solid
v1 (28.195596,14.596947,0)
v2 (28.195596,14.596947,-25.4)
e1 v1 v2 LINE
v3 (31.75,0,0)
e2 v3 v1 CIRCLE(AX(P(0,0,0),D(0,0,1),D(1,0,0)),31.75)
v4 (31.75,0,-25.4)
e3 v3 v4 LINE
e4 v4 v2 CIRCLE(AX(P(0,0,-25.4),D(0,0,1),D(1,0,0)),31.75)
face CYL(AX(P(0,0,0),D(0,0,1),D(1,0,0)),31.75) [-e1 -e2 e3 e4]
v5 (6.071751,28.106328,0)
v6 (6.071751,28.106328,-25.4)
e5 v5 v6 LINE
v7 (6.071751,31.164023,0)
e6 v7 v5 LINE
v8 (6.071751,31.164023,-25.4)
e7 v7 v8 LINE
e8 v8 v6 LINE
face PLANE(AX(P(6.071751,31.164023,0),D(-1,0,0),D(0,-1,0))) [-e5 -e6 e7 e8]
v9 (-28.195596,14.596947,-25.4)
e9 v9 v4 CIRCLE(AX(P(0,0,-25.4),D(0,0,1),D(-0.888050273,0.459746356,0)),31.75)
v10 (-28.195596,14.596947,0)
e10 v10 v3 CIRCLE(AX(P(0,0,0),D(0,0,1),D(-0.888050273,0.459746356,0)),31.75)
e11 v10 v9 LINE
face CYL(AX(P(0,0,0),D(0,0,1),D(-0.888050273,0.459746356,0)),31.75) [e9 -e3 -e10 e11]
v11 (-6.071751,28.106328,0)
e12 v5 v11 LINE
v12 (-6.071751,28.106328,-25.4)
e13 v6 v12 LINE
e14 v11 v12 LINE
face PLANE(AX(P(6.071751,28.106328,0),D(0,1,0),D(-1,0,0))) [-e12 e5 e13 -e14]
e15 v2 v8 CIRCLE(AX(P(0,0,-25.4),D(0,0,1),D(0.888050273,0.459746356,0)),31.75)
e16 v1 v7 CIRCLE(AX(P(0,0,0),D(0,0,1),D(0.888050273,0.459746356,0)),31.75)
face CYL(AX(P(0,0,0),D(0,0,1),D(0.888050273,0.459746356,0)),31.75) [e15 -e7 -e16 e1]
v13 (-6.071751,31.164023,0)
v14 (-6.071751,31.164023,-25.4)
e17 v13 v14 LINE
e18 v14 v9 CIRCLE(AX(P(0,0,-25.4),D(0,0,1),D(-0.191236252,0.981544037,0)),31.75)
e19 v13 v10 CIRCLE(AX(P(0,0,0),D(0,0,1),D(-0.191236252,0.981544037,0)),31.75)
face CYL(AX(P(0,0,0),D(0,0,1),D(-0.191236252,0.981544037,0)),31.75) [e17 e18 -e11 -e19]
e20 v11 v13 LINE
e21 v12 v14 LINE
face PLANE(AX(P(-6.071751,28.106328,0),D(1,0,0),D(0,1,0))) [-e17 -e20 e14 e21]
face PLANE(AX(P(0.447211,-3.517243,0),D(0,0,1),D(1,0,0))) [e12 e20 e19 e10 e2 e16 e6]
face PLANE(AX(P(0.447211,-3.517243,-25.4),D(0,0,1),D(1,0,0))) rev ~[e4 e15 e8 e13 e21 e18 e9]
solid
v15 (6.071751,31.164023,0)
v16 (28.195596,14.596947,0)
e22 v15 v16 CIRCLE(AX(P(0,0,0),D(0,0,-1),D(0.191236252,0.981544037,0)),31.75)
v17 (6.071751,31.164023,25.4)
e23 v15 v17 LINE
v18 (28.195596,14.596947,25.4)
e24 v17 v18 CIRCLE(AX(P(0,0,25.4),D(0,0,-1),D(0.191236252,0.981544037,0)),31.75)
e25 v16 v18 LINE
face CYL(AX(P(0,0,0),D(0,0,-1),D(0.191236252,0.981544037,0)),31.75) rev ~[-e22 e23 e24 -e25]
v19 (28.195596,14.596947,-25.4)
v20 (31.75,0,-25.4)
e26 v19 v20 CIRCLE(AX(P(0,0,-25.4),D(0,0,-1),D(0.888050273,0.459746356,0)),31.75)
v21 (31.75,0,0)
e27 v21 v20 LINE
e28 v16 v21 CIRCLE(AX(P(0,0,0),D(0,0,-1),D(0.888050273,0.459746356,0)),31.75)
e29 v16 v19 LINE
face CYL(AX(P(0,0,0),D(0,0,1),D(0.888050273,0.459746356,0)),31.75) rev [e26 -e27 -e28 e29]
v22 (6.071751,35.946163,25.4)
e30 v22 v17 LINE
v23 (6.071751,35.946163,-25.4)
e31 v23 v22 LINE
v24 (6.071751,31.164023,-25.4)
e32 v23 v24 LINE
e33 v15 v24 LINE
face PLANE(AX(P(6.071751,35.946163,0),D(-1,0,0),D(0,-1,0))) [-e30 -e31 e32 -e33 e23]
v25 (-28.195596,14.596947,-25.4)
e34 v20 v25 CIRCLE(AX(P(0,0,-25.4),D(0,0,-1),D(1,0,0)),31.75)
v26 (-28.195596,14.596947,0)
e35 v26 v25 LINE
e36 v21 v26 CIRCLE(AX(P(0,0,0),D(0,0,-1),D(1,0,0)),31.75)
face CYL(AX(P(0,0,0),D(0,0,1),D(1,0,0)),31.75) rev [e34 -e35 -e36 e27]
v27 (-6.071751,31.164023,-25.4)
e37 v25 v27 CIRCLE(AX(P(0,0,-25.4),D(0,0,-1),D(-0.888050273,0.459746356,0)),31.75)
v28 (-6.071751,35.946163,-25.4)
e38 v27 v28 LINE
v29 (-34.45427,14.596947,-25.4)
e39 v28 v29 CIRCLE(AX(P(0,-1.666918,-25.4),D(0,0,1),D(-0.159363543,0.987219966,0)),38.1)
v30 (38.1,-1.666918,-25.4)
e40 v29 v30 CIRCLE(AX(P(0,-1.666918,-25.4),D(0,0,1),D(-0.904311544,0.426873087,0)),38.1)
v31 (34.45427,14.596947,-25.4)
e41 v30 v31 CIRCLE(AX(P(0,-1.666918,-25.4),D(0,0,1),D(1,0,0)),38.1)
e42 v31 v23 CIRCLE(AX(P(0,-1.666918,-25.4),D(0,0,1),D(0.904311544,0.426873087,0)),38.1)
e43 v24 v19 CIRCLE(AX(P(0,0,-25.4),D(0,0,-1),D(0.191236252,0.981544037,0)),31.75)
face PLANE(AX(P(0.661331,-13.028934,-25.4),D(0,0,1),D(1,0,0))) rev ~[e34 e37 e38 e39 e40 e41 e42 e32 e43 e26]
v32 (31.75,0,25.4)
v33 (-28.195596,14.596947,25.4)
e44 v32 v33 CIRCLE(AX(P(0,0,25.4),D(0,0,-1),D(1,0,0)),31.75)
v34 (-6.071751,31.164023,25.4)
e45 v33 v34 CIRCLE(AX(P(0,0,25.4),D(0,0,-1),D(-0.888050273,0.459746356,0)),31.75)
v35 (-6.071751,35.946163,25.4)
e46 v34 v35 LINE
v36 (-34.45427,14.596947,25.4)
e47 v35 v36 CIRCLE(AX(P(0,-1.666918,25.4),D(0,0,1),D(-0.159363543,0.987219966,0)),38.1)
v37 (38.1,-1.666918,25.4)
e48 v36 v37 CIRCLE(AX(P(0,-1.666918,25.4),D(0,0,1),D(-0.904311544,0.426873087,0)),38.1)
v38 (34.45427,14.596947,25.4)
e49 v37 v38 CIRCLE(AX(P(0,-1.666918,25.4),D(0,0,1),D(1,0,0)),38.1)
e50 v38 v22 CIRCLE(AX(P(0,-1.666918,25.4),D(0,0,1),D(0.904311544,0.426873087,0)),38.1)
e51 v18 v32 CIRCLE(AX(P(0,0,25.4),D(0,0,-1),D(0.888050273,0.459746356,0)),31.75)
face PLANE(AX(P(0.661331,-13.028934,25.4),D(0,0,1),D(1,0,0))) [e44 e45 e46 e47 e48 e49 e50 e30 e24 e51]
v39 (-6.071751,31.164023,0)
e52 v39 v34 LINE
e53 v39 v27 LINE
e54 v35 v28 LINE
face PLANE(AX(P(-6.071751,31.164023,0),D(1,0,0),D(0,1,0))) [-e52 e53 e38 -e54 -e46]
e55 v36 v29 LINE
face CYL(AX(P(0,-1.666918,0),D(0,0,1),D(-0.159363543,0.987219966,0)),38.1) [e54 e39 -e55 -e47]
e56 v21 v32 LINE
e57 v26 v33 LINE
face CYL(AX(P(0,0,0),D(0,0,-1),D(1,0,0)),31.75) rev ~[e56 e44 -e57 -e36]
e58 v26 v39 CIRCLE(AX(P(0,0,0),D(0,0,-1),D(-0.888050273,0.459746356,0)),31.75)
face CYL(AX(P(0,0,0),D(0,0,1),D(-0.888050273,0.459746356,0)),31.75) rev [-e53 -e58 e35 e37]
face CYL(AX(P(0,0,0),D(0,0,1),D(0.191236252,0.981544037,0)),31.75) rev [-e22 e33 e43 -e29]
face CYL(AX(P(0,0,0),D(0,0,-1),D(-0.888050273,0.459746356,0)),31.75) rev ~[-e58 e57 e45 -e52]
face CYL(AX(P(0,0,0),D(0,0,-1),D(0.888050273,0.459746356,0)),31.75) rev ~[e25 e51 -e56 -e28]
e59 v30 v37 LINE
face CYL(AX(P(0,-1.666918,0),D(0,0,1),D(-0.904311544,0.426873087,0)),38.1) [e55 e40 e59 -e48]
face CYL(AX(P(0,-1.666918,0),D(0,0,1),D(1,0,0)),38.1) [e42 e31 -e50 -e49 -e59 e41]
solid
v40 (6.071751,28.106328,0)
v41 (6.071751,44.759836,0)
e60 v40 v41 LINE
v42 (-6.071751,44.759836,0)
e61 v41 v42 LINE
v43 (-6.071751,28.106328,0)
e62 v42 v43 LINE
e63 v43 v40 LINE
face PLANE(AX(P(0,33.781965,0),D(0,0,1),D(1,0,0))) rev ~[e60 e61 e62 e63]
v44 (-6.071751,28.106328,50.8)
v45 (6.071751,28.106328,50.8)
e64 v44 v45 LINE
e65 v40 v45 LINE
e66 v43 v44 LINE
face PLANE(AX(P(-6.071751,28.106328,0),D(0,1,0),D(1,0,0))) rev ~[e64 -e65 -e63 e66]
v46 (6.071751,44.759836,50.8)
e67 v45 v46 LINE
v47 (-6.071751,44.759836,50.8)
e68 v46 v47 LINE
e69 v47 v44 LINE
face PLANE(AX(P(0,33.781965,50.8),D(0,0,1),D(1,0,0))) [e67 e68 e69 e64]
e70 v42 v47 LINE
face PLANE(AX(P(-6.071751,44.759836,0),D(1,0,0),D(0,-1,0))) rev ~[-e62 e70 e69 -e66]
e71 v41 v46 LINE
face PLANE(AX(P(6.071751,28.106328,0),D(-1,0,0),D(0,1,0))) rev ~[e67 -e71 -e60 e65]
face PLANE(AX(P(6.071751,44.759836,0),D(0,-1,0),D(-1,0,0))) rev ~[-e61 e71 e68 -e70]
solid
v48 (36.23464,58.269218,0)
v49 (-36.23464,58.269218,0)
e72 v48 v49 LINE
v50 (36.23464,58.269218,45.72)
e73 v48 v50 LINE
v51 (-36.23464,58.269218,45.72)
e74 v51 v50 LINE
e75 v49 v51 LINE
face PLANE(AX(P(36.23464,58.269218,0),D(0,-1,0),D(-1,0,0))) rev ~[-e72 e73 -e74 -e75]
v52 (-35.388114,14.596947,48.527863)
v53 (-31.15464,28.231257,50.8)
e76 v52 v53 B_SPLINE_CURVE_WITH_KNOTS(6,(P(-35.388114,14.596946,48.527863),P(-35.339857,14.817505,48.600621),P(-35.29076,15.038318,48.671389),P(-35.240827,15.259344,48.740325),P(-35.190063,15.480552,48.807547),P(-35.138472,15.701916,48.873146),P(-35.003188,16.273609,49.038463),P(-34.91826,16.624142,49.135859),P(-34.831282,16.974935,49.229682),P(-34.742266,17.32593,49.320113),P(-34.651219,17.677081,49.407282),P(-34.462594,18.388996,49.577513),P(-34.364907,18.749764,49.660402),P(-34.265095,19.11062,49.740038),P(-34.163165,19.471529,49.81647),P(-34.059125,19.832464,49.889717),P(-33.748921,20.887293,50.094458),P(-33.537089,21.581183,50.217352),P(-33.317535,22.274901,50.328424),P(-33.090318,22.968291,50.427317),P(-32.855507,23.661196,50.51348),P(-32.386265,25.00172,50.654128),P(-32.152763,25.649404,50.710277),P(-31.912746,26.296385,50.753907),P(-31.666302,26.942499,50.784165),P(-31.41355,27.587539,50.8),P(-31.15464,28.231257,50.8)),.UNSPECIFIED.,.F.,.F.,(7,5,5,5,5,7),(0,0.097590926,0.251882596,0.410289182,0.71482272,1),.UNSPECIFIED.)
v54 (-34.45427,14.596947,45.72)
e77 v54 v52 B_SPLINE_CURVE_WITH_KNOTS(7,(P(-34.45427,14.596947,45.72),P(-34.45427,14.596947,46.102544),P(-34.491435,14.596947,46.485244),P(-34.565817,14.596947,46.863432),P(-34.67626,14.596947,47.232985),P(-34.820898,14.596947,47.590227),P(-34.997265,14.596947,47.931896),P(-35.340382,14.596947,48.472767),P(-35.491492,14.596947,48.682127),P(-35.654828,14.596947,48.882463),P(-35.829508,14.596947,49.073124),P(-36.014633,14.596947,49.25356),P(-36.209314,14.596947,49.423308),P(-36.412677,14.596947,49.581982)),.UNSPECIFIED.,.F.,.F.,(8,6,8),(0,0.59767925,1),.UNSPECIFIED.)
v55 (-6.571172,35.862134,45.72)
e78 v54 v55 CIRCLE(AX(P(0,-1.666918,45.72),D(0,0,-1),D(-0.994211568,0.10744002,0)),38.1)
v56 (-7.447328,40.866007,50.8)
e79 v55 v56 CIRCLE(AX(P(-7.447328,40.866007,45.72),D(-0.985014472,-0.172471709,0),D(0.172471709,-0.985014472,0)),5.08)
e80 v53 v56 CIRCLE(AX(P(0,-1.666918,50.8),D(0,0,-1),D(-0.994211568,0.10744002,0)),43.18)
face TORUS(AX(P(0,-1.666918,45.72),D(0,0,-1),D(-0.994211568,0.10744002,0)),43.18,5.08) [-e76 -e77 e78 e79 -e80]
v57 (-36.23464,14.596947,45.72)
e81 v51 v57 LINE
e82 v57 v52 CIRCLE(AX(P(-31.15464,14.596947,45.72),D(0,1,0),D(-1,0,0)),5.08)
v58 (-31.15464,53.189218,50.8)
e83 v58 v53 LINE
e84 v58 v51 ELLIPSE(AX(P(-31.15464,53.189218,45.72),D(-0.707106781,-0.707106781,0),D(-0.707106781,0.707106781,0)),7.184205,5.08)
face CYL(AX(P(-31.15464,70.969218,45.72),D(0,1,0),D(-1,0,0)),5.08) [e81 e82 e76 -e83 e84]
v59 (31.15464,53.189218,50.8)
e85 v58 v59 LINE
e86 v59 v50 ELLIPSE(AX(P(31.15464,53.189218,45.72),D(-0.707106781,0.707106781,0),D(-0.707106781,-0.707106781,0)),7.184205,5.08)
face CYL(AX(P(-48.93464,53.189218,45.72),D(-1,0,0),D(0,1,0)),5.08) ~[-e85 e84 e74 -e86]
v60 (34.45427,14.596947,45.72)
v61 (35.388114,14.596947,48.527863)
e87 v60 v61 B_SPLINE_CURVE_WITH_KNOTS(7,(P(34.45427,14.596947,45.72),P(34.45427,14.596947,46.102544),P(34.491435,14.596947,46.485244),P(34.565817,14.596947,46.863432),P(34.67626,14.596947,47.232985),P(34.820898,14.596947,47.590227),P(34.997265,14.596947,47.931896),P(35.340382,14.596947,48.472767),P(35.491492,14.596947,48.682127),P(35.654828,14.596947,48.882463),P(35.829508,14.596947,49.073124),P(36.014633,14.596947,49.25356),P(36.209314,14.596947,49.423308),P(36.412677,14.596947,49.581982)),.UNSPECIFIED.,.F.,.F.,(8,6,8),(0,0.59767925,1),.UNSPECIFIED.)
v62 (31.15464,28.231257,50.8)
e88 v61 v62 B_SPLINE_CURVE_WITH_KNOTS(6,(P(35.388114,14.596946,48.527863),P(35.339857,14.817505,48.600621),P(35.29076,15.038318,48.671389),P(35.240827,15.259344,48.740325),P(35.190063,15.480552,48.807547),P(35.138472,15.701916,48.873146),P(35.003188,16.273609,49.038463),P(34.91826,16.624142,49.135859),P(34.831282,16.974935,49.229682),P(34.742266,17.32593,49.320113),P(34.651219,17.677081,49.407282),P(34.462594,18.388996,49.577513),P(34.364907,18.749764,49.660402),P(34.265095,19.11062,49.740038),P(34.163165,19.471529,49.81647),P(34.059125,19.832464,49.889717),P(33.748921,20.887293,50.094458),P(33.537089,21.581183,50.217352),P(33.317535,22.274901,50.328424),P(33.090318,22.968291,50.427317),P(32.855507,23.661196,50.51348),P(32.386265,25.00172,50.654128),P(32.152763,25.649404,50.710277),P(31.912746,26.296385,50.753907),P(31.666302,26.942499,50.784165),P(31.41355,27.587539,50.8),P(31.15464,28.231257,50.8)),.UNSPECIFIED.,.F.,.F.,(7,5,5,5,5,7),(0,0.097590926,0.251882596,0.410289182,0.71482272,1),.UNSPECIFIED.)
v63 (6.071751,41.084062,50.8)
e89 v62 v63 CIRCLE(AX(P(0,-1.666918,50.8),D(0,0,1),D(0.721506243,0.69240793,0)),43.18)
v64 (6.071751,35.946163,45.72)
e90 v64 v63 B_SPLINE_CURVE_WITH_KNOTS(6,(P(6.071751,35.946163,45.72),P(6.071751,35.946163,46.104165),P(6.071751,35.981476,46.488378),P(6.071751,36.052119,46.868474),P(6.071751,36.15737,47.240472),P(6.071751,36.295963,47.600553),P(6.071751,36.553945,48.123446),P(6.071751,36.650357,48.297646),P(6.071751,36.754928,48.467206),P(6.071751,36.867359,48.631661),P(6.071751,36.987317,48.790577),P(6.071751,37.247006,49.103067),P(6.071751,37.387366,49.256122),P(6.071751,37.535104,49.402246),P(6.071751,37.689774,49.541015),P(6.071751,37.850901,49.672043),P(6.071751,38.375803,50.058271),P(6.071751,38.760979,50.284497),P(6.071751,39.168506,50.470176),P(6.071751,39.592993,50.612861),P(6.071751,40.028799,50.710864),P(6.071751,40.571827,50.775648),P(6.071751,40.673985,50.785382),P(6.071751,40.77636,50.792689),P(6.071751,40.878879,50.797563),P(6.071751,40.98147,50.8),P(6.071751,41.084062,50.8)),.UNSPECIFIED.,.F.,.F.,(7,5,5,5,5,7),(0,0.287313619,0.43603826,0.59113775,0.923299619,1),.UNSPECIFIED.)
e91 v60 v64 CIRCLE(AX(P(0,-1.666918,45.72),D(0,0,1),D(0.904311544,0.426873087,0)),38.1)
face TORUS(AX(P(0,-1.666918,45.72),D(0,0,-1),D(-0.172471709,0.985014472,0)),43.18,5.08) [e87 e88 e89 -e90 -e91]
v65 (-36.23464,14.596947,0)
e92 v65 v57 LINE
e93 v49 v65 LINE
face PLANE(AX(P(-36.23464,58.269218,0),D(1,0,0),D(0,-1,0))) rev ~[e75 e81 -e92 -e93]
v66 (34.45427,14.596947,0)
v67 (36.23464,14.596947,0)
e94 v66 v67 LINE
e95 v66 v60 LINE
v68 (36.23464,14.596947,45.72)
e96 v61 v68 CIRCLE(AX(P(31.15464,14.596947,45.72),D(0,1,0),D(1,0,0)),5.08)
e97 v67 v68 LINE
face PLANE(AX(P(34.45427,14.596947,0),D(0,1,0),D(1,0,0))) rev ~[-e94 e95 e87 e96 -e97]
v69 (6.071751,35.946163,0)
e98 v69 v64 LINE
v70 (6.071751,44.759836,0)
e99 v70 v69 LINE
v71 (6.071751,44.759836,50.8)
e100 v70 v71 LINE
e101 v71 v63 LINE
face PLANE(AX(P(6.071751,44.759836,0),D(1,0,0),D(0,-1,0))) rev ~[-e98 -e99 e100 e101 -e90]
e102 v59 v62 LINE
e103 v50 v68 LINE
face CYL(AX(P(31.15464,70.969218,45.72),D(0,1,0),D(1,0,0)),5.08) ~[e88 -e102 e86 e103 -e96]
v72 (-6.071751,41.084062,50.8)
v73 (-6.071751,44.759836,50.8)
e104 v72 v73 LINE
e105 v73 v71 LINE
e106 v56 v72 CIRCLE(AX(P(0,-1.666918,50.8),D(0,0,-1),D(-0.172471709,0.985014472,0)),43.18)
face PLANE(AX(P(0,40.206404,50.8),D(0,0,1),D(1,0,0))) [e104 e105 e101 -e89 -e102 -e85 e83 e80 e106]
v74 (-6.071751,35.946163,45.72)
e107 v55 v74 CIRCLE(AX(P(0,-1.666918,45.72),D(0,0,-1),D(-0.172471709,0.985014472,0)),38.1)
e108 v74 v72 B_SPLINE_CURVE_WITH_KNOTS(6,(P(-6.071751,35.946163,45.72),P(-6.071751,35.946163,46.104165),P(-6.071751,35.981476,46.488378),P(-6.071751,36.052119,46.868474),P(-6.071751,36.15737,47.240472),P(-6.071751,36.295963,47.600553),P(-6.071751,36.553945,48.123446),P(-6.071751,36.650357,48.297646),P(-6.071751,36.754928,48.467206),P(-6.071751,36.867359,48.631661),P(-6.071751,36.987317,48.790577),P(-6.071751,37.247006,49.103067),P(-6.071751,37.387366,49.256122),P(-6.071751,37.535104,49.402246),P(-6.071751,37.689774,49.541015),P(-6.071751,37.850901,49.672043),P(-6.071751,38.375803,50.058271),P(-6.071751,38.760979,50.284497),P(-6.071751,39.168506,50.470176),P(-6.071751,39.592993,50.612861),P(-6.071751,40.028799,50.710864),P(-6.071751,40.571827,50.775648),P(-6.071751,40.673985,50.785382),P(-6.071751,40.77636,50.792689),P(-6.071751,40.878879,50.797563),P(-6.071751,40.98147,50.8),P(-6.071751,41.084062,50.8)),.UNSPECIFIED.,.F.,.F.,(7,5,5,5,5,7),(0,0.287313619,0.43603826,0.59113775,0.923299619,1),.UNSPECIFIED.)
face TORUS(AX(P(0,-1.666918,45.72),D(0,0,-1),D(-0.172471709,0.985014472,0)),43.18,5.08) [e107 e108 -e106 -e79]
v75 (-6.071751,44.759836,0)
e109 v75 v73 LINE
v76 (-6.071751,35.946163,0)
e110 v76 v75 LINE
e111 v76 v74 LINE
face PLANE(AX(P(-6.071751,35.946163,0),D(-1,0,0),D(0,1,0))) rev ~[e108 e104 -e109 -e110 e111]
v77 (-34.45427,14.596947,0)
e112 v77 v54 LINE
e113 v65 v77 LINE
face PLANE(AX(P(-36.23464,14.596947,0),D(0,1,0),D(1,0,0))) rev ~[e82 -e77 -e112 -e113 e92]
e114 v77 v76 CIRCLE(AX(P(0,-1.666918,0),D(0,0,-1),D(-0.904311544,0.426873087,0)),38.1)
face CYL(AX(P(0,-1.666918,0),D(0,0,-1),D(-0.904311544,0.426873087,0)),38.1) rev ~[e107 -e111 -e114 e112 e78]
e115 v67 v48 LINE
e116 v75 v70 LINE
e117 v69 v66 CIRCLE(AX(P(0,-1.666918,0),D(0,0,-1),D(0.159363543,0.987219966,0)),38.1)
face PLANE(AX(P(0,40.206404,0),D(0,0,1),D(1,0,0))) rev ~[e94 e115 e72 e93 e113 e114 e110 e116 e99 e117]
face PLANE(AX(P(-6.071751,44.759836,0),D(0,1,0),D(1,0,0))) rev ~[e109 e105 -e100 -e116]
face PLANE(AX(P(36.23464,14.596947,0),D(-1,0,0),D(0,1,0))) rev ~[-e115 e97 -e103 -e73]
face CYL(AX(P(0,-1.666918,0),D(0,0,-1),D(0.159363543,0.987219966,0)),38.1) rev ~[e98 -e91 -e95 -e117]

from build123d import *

# Parameters (mm, degrees)
F1_DEPTH    = 50.8
F2_DEPTH    = 25.4
F3_DEPTH    = 25.4
F4_T1_DEPTH = 97.86927917
F4_T3_DEPTH = 69.072270802
F4_T6_ANGLE = 93.763795783
F4_T8_ANGLE = 93.763795783
F5_DEPTH    = 50.8


# Not quite as in the source:
# - a fillet or chamfer that OpenCascade refuses, or shapes differently, is made with other operations: its cross-section is extruded or revolved along the edge and cut away or added


with BuildPart() as f1:
    # F0 (on Top) → F1 (new body)
    with BuildSketch(Plane.XY):
        with BuildLine():
            ThreePointArc((6.0717510059, 35.9461629091), (22.9027694367, 28.7809581965), (34.4542698124, 14.5969468084))
            Line((34.4542698124, 14.5969468084), (36.234639585, 14.5969468084))
            Line((36.234639585, 14.5969468084), (36.234639585, 58.2692176104))
            Line((36.234639585, 58.2692176104), (-36.234639585, 58.2692176104))
            Line((-36.234639585, 58.2692176104), (-36.234639585, 14.5969468084))
            Line((-36.234639585, 14.5969468084), (-34.4542698124, 14.5969468084))
            ThreePointArc((-34.4542698124, 14.5969468084), (-22.9027694367, 28.7809581965), (-6.0717510059, 35.9461629091))
            Line((-6.0717510059, 35.9461629091), (-6.0717510059, 44.7598363188))
            Line((-6.0717510059, 44.7598363188), (6.0717510059, 44.7598363188))
            Line((6.0717510059, 44.7598363188), (6.0717510059, 35.9461629091))
        make_face()
    extrude(amount=F1_DEPTH)

    # F4: fillet of radius 5.08 on 5 edges, made by hand

    # F4_s2 → F4_t1 (cut)
    with BuildSketch(Plane.YZ.offset(-48.934639585)):
        with BuildLine():
            ThreePointArc((58.2692176104, 45.72), (56.7813200588, 49.3121024484), (53.1892176104, 50.8))
            Line((53.1892176104, 50.8), (58.2692176104, 50.8))
            Line((58.2692176104, 50.8), (58.2692176104, 45.72))
        make_face()
    extrude(amount=F4_T1_DEPTH, mode=Mode.SUBTRACT)

    # F4_s4 → F4_t3 (cut)
    with BuildSketch(Plane.XZ.offset(-70.9692176104)):
        with BuildLine():
            ThreePointArc((36.234639585, 45.72), (34.7467420334, 49.3121024484), (31.154639585, 50.8))
            Line((31.154639585, 50.8), (36.234639585, 50.8))
            Line((36.234639585, 50.8), (36.234639585, 45.72))
        make_face()
        with BuildLine():
            ThreePointArc((-36.234639585, 45.72), (-34.7467420334, 49.3121024484), (-31.154639585, 50.8))
            Line((-31.154639585, 50.8), (-36.234639585, 50.8))
            Line((-36.234639585, 50.8), (-36.234639585, 45.72))
        make_face()
    extrude(amount=F4_T3_DEPTH, mode=Mode.SUBTRACT)

    # F4_s5 → F4_t6 (revolve, cut)
    with BuildSketch(Plane(origin=(-0.2831878776, -0.0495849538, 0), x_dir=(0, 0, 1), z_dir=(-0.9850144718, -0.1724717085, 0))):
        with BuildLine():
            ThreePointArc((45.72, 36.4580618529), (49.3121024484, 37.9459594044), (50.8, 41.5380618529))
            Line((50.8, 41.5380618529), (50.8, 36.4580618529))
            Line((50.8, 36.4580618529), (45.72, 36.4580618529))
        make_face()
    revolve(axis=Axis((0, -1.6669177906, 50.8), (0, 0, -1)), revolution_arc=F4_T6_ANGLE, mode=Mode.SUBTRACT)

    # F4_s7 → F4_t8 (revolve, cut)
    with BuildSketch(Plane(origin=(-0.1780570086, -1.6476759621, 0), x_dir=(0, 0, 1), z_dir=(-0.1074400196, -0.9942115681, 0))):
        with BuildLine():
            ThreePointArc((45.72, 37.9209063199), (49.3121024484, 39.4088038715), (50.8, 43.0009063199))
            Line((50.8, 43.0009063199), (50.8, 37.9209063199))
            Line((50.8, 37.9209063199), (45.72, 37.9209063199))
        make_face()
    revolve(axis=Axis((0, -1.6669177906, 50.8), (0, 0, -1)), revolution_arc=F4_T8_ANGLE, mode=Mode.SUBTRACT)


with BuildPart() as f2:
    # F0 (on Top) → F2 (new body, symmetric)
    with BuildSketch(Plane.XY):
        with BuildLine():
            ThreePointArc((-34.4542698124, 14.5969468084), (-8.3337362614, -38.8443146861), (38.1, -1.6669177906))
            ThreePointArc((38.1, -1.6669177906), (37.1773968955, 6.6668184707), (34.4542698124, 14.5969468084))
            Line((34.4542698124, 14.5969468084), (28.1955961787, 14.5969468084))
            ThreePointArc((28.1955961787, 14.5969468084), (30.8486035233, 7.5117348637), (31.75, 0))
            ThreePointArc((31.75, 0), (-7.5117348637, -30.8486035233), (-28.1955961787, 14.5969468084))
            Line((-28.1955961787, 14.5969468084), (-34.4542698124, 14.5969468084))
        make_face()
        with BuildLine():
            Line((28.1955961787, 14.5969468084), (34.4542698124, 14.5969468084))
            ThreePointArc((34.4542698124, 14.5969468084), (22.9027694367, 28.7809581965), (6.0717510059, 35.9461629091))
            Line((6.0717510059, 35.9461629091), (6.0717510059, 31.1640231633))
            ThreePointArc((6.0717510059, 31.1640231633), (19.0310213994, 25.414222878), (28.1955961787, 14.5969468084))
        make_face()
        with BuildLine():
            ThreePointArc((-6.0717510059, 35.9461629091), (-22.9027694367, 28.7809581965), (-34.4542698124, 14.5969468084))
            Line((-34.4542698124, 14.5969468084), (-28.1955961787, 14.5969468084))
            ThreePointArc((-28.1955961787, 14.5969468084), (-19.0310213994, 25.414222878), (-6.0717510059, 31.1640231633))
            Line((-6.0717510059, 31.1640231633), (-6.0717510059, 35.9461629091))
        make_face()
    extrude(amount=F2_DEPTH, both=True)


with BuildPart() as f3:
    # F0 (on Top) → F3 (new body)
    with BuildSketch(Plane.XY):
        with BuildLine():
            ThreePointArc((31.75, 0), (30.8486035233, 7.5117348637), (28.1955961787, 14.5969468084))
            Line((28.1955961787, 14.5969468084), (-28.1955961787, 14.5969468084))
            ThreePointArc((-28.1955961787, 14.5969468084), (-7.5117348637, -30.8486035233), (31.75, 0))
        make_face()
        with BuildLine():
            Line((-28.1955961787, 14.5969468084), (28.1955961787, 14.5969468084))
            ThreePointArc((28.1955961787, 14.5969468084), (19.0310213994, 25.414222878), (6.0717510059, 31.1640231633))
            Line((6.0717510059, 31.1640231633), (6.0717510059, 28.1063281))
            Line((6.0717510059, 28.1063281), (-6.0717510059, 28.1063281))
            Line((-6.0717510059, 28.1063281), (-6.0717510059, 31.1640231633))
            ThreePointArc((-6.0717510059, 31.1640231633), (-19.0310213994, 25.414222878), (-28.1955961787, 14.5969468084))
        make_face()
    extrude(amount=-F3_DEPTH)


with BuildPart() as f5:
    # F0 (on Top) → F5 (new body)
    with BuildSketch(Plane.XY):
        with BuildLine():
            Line((6.0717510059, 31.1640231633), (6.0717510059, 35.9461629091))
            ThreePointArc((6.0717510059, 35.9461629091), (0, 36.4330822094), (-6.0717510059, 35.9461629091))
            Line((-6.0717510059, 35.9461629091), (-6.0717510059, 31.1640231633))
            ThreePointArc((-6.0717510059, 31.1640231633), (0, 31.75), (6.0717510059, 31.1640231633))
        make_face()
        with BuildLine():
            ThreePointArc((-6.0717510059, 35.9461629091), (0, 36.4330822094), (6.0717510059, 35.9461629091))
            Line((6.0717510059, 35.9461629091), (6.0717510059, 44.7598363188))
            Line((6.0717510059, 44.7598363188), (-6.0717510059, 44.7598363188))
            Line((-6.0717510059, 44.7598363188), (-6.0717510059, 35.9461629091))
        make_face()
        with BuildLine():
            Line((6.0717510059, 28.1063281), (6.0717510059, 31.1640231633))
            ThreePointArc((6.0717510059, 31.1640231633), (0, 31.75), (-6.0717510059, 31.1640231633))
            Line((-6.0717510059, 31.1640231633), (-6.0717510059, 28.1063281))
            Line((-6.0717510059, 28.1063281), (6.0717510059, 28.1063281))
        make_face()
    extrude(amount=F5_DEPTH)


solid = Compound([f1.part, f2.part, f3.part, f5.part])
